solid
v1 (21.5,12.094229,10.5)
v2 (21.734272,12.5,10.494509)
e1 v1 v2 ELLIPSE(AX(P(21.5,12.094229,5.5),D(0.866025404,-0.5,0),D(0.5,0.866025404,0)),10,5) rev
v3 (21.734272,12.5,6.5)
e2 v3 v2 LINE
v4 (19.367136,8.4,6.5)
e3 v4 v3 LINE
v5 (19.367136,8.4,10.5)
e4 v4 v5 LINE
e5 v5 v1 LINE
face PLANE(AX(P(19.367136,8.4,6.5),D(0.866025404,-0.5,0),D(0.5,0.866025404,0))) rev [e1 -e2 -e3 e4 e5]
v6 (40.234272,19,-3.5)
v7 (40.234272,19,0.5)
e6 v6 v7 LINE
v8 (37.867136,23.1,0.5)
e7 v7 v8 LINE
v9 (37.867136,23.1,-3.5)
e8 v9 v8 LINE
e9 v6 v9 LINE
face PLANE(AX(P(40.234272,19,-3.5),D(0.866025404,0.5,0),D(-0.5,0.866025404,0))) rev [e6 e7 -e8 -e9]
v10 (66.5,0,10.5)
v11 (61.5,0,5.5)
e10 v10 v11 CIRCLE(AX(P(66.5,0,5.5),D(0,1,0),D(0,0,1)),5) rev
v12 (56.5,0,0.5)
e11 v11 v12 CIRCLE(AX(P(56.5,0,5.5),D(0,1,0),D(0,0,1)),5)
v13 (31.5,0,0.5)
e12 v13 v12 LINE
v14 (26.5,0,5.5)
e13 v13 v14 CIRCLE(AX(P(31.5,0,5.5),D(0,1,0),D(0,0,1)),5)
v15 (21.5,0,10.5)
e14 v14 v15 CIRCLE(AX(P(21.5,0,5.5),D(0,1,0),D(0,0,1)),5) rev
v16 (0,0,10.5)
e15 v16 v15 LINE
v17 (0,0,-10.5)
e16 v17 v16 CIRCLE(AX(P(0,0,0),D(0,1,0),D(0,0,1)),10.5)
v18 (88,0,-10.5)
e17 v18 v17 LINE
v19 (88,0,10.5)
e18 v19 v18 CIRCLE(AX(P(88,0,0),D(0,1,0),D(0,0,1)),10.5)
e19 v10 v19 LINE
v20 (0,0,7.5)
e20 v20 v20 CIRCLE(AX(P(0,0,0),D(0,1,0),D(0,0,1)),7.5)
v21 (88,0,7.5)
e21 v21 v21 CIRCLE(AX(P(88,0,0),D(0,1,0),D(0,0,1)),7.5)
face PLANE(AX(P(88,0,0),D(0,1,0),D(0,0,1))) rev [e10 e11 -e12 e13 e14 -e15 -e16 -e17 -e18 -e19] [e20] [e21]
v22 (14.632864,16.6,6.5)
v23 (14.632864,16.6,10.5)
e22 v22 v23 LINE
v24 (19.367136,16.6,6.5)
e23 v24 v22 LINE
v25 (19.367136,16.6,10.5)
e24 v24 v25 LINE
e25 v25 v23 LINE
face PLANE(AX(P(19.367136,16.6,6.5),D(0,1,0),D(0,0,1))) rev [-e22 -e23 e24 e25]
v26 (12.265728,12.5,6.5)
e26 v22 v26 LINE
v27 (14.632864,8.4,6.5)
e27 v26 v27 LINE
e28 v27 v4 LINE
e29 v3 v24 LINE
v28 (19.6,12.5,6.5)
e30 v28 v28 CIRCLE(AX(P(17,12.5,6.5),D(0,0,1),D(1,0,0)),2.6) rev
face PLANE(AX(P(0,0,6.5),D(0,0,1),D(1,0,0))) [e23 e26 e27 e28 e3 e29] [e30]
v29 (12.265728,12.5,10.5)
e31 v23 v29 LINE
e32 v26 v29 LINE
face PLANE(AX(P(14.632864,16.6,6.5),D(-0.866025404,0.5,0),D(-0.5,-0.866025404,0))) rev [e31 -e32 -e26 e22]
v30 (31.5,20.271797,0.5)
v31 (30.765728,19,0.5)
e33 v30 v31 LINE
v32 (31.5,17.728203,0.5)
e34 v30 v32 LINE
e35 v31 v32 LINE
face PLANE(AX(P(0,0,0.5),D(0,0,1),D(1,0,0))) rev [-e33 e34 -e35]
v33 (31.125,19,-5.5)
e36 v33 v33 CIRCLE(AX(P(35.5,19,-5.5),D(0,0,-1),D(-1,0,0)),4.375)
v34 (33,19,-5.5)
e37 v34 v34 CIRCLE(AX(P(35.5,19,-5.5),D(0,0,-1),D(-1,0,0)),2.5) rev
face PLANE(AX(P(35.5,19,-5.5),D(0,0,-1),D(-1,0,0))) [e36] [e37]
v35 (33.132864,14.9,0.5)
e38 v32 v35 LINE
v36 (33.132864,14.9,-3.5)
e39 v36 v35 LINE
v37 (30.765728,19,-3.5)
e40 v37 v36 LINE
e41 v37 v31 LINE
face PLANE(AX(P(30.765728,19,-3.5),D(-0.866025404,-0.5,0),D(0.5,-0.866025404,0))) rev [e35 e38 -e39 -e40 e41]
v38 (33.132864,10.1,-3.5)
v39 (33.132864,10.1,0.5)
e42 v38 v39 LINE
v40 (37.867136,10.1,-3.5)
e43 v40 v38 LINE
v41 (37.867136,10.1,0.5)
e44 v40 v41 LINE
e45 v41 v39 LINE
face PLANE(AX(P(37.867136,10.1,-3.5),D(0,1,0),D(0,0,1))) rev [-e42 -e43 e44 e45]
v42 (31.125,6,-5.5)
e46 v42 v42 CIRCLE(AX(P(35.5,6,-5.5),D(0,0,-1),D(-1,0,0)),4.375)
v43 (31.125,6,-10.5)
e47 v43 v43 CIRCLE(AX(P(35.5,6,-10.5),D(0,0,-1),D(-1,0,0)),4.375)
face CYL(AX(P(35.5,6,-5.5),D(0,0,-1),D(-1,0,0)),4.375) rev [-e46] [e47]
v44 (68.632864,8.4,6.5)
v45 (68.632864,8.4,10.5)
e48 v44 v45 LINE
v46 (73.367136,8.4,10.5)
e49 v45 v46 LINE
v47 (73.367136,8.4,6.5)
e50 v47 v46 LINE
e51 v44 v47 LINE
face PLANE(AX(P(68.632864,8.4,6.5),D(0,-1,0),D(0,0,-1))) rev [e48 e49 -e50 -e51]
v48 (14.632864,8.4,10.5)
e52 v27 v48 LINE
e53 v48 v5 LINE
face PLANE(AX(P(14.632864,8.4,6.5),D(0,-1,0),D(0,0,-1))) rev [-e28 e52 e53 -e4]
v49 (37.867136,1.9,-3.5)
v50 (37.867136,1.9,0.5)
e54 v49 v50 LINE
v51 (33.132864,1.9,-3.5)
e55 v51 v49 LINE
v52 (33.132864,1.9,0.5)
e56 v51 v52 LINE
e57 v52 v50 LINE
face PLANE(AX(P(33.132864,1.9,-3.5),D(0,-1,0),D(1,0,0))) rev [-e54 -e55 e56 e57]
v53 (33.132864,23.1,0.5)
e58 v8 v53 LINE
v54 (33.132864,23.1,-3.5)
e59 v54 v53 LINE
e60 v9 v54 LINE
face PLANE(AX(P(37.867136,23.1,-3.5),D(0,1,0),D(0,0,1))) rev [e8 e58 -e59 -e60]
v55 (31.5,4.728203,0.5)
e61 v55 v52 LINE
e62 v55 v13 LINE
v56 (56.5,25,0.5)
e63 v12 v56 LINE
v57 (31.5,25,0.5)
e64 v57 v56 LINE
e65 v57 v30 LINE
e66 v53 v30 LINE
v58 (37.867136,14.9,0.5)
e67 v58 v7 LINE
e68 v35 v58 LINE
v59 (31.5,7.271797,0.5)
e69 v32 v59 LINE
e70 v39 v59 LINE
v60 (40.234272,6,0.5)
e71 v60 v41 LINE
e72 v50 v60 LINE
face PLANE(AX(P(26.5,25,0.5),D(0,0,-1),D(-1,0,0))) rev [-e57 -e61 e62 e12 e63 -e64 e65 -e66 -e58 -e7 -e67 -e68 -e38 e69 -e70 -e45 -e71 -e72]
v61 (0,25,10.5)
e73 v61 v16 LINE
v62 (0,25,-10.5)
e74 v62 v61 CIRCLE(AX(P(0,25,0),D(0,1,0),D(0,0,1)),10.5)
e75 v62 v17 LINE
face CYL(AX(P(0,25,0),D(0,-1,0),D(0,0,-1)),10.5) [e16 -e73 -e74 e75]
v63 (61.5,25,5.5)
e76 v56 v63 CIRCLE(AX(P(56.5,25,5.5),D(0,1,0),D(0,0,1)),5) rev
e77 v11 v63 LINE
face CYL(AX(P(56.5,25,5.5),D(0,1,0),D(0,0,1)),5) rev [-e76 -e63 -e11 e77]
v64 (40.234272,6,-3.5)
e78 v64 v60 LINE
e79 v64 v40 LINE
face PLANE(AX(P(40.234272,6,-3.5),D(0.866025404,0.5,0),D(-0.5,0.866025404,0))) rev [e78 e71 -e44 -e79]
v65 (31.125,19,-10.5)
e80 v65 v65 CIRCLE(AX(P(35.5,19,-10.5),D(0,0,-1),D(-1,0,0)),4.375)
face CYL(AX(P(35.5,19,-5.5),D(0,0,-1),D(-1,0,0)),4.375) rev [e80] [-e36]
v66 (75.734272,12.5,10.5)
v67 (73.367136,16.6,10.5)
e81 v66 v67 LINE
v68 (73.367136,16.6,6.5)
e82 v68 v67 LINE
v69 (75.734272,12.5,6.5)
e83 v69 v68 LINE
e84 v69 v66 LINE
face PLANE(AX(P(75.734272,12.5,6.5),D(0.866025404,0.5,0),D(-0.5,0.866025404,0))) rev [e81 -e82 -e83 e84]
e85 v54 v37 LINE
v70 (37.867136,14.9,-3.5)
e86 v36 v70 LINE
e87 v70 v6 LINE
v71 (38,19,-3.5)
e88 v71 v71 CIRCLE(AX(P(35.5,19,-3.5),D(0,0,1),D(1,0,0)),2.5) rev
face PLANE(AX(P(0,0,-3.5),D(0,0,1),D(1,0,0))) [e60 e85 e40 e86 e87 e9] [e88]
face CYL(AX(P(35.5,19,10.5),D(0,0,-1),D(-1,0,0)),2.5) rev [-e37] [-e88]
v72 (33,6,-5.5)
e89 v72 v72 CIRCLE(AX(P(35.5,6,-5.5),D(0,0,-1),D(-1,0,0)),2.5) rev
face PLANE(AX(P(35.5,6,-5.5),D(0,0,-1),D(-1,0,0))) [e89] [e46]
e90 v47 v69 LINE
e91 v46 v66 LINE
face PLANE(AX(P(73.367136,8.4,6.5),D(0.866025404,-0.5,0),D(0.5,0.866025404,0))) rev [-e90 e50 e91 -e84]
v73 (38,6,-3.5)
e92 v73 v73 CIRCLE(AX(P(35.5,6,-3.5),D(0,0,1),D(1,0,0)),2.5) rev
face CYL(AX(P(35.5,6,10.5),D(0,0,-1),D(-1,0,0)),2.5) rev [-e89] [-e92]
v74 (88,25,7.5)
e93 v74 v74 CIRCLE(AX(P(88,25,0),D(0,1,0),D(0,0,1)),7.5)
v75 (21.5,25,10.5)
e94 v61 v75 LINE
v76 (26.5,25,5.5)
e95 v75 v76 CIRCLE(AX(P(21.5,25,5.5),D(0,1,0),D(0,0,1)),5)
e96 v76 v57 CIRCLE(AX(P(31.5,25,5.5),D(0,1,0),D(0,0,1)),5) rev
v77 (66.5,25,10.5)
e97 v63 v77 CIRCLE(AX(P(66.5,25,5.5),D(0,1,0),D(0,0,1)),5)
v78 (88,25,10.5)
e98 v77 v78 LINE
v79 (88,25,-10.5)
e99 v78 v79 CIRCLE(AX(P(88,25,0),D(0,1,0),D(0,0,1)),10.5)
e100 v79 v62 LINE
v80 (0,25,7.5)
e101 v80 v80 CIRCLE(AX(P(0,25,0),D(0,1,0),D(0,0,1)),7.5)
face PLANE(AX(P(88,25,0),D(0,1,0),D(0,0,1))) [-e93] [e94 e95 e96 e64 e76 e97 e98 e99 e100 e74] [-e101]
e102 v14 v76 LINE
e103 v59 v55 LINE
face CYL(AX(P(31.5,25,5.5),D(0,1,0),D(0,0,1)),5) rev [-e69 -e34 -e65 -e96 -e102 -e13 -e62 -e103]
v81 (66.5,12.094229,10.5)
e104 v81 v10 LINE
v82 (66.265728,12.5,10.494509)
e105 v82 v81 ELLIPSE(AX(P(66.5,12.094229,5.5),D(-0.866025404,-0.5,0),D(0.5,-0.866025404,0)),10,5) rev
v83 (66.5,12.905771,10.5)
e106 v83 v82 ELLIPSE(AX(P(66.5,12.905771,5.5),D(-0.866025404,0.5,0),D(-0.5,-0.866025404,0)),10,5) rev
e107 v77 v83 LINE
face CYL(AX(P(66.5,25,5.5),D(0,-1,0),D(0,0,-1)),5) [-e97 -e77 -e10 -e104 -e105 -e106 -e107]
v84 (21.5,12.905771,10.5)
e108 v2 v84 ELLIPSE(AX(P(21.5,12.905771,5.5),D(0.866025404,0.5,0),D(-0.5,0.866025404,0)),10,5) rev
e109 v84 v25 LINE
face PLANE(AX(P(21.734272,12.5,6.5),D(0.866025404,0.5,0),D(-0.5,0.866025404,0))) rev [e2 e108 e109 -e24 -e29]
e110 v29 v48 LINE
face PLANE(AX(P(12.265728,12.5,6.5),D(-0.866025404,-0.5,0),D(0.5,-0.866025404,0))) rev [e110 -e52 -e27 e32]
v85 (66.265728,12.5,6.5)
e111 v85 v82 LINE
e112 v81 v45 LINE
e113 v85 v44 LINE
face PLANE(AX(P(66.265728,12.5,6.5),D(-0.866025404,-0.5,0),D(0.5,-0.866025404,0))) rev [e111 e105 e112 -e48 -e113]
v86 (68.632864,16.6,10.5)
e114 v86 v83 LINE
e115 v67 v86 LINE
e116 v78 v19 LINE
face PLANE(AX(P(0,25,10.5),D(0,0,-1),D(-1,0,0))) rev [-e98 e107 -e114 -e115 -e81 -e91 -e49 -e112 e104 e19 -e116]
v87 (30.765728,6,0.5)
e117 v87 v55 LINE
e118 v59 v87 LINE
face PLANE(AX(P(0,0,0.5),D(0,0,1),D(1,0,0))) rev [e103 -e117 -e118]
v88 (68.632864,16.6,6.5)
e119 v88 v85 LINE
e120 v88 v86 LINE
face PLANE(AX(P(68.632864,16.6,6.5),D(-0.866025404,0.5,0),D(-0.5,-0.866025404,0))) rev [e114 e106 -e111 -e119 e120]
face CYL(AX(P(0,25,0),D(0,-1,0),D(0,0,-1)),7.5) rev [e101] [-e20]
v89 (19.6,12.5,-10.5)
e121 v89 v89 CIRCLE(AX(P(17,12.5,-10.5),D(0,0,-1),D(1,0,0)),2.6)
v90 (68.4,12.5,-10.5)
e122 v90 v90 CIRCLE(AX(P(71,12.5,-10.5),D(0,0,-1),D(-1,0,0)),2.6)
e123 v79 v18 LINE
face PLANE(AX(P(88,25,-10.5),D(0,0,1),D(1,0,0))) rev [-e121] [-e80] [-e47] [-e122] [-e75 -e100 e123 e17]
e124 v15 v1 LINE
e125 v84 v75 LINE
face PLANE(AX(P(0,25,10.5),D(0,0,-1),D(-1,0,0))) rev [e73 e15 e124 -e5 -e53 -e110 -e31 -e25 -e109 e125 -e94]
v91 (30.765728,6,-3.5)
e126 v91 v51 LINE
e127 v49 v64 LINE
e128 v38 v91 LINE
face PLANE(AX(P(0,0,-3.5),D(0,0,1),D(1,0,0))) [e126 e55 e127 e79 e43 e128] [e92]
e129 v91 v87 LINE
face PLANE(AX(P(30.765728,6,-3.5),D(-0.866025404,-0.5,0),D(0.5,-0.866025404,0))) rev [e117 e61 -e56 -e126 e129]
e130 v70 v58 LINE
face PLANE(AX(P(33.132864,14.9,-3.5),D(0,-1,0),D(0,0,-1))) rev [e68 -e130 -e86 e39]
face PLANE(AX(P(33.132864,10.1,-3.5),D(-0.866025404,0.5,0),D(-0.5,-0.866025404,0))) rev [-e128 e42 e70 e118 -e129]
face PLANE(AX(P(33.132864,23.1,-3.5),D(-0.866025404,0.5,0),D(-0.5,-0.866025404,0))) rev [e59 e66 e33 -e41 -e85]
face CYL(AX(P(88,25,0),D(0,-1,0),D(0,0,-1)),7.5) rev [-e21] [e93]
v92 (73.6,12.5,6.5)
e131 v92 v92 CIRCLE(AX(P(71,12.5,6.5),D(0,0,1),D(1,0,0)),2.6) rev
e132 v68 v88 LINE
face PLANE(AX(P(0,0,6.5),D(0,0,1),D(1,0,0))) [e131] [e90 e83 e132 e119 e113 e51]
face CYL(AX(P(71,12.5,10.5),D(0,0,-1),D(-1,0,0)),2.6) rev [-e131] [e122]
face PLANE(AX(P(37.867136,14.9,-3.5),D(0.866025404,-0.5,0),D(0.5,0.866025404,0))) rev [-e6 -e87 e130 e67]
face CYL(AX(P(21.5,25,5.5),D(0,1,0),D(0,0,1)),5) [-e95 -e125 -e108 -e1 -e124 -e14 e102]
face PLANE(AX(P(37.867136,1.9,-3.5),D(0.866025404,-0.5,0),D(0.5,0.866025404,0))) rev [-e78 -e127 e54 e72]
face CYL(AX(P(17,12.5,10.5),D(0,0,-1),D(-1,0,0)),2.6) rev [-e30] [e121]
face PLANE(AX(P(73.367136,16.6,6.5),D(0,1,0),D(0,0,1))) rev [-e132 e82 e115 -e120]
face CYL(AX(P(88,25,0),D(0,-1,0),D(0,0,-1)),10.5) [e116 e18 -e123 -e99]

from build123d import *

# Parameters (mm, degrees)
CROQUIS1_R              = 7.5
SALIENTE_EXTRUIR1_DEPTH = 25
CROQUIS6_W              = 35
CROQUIS6_H              = 20
CORTAR_EXTRUIR3_DEPTH   = 103.164083709
REDONDEO3_START         = -1
REDONDEO3_DEPTH         = 27
REDONDEO3_2_DEPTH       = 25
CROQUIS7_R              = 2.5
CORTAR_EXTRUIR4_DEPTH   = 104.770178761
CROQUIS8_R              = 4.375
CORTAR_EXTRUIR5_DEPTH   = 5
CROQUIS9_R              = 2.6
CORTAR_EXTRUIR6_DEPTH   = 104.770178761
CORTAR_EXTRUIR7_DEPTH   = 4
CORTAR_EXTRUIR8_DEPTH   = 4
CORTAR_EXTRUIR9_DEPTH   = 4


with BuildPart() as part:
    # Croquis1 → Saliente-Extruir1 (new body)
    with BuildSketch(Plane(origin=(0, 0, 0), x_dir=(1, 0, 0), z_dir=(0, 1, 0))):
        with BuildLine():
            Line((88, 10.5), (0, 10.5))
            ThreePointArc((0, 10.5), (-10.5, 0), (0, -10.5))
            Line((0, -10.5), (88, -10.5))
            ThreePointArc((88, -10.5), (98.5, 0), (88, 10.5))
        make_face()
        with Locations(Location((0, 0, 0), (0, 0, 270))):
            Circle(CROQUIS1_R, mode=Mode.SUBTRACT)
        with Locations(Location((88, 0, 0), (0, 0, 270))):
            Circle(CROQUIS1_R, mode=Mode.SUBTRACT)
    extrude(amount=SALIENTE_EXTRUIR1_DEPTH)

    # Croquis6 → Cortar-Extruir3 (cut, through all)
    with BuildSketch(Plane.XZ):
        with Locations((44, 10.5)):
            Rectangle(CROQUIS6_W, CROQUIS6_H)
    extrude(amount=-CORTAR_EXTRUIR3_DEPTH, mode=Mode.SUBTRACT)

    # Redondeo3: read off the stored shape, not the designer's step
    # Redondeo3 outline → Redondeo3 (cut)
    with BuildSketch(Plane(origin=(0, 0, 0), x_dir=(1, 0, 0), z_dir=(0, 1, 0)).offset(REDONDEO3_START)):
        with BuildLine():
            Line((26.5, -10.5), (26.5, -5.5))
            ThreePointArc((26.5, -5.5), (25.035533906, -9.035533906), (21.5, -10.5))
            Line((21.5, -10.5), (26.5, -10.5))
        make_face()
        with BuildLine():
            ThreePointArc((66.5, -10.5), (62.964466094, -9.035533906), (61.5, -5.5))
            Line((61.5, -5.5), (61.5, -10.5))
            Line((61.5, -10.5), (66.5, -10.5))
        make_face()
    extrude(amount=REDONDEO3_DEPTH, mode=Mode.SUBTRACT)

    # Redondeo3 2 outline → Redondeo3 2 (add)
    with BuildSketch(Plane(origin=(0, 0, 0), x_dir=(1, 0, 0), z_dir=(0, 1, 0))):
        with BuildLine():
            Line((61.5, -0.5), (56.5, -0.5))
            ThreePointArc((56.5, -0.5), (60.035533906, -1.964466094), (61.5, -5.5))
            Line((61.5, -5.5), (61.5, -0.5))
        make_face()
        with BuildLine():
            ThreePointArc((26.5, -5.5), (27.964466094, -1.964466094), (31.5, -0.5))
            Line((31.5, -0.5), (26.5, -0.5))
            Line((26.5, -0.5), (26.5, -5.5))
        make_face()
    extrude(amount=REDONDEO3_2_DEPTH)

    # Croquis7 → Cortar-Extruir4 (cut, through all)
    with BuildSketch(Plane(origin=(0, 0, -10.5), x_dir=(-1, 0, 0), z_dir=(0, 0, -1))):
        with Locations((-35.5, 19)):
            Circle(CROQUIS7_R)
        with Locations((-35.5, 6)):
            Circle(CROQUIS7_R)
    extrude(amount=-CORTAR_EXTRUIR4_DEPTH, mode=Mode.SUBTRACT)

    # Croquis8 → Cortar-Extruir5 (cut)
    with BuildSketch(Plane(origin=(0, 0, -10.5), x_dir=(-1, 0, 0), z_dir=(0, 0, -1))):
        with Locations((-35.5, 19)):
            Circle(CROQUIS8_R)
        with Locations((-35.5, 6)):
            Circle(CROQUIS8_R)
    extrude(amount=-CORTAR_EXTRUIR5_DEPTH, mode=Mode.SUBTRACT)

    # Croquis9 → Cortar-Extruir6 (cut, through all)
    with BuildSketch(Plane(origin=(0, 0, -10.5), x_dir=(-1, 0, 0), z_dir=(0, 0, -1))):
        with Locations((-71, 12.5)):
            Circle(CROQUIS9_R)
        with Locations(Location((-17, 12.5, 0), (0, 0, 180))):
            Circle(CROQUIS9_R)
    extrude(amount=-CORTAR_EXTRUIR6_DEPTH, mode=Mode.SUBTRACT)

    # Croquis10 → Cortar-Extruir7 (cut)
    with BuildSketch(Plane.XY.offset(10.5)):
        Polygon((75.734272207, 12.5), (73.367136104, 16.6), (68.632863896, 16.6), (66.265727793, 12.5), (68.632863896, 8.4), (73.367136104, 8.4), align=None)
    extrude(amount=-CORTAR_EXTRUIR7_DEPTH, mode=Mode.SUBTRACT)

    # Croquis11 → Cortar-Extruir8 (cut)
    with BuildSketch(Plane.XY.offset(0.5)):
        Polygon((40.234272207, 6), (37.867136104, 10.1), (33.132863896, 10.1), (30.765727793, 6), (33.132863896, 1.9), (37.867136104, 1.9), align=None)
        Polygon((40.234272207, 19), (37.867136104, 23.1), (33.132863896, 23.1), (30.765727793, 19), (33.132863896, 14.9), (37.867136104, 14.9), align=None)
    extrude(amount=-CORTAR_EXTRUIR8_DEPTH, mode=Mode.SUBTRACT)

    # Croquis12 → Cortar-Extruir9 (cut)
    with BuildSketch(Plane.XY.offset(10.5)):
        Polygon((12.265727793, 12.5), (14.632863896, 8.4), (19.367136104, 8.4), (21.734272207, 12.5), (19.367136104, 16.6), (14.632863896, 16.6), align=None)
    extrude(amount=-CORTAR_EXTRUIR9_DEPTH, mode=Mode.SUBTRACT)


solid = part.part
